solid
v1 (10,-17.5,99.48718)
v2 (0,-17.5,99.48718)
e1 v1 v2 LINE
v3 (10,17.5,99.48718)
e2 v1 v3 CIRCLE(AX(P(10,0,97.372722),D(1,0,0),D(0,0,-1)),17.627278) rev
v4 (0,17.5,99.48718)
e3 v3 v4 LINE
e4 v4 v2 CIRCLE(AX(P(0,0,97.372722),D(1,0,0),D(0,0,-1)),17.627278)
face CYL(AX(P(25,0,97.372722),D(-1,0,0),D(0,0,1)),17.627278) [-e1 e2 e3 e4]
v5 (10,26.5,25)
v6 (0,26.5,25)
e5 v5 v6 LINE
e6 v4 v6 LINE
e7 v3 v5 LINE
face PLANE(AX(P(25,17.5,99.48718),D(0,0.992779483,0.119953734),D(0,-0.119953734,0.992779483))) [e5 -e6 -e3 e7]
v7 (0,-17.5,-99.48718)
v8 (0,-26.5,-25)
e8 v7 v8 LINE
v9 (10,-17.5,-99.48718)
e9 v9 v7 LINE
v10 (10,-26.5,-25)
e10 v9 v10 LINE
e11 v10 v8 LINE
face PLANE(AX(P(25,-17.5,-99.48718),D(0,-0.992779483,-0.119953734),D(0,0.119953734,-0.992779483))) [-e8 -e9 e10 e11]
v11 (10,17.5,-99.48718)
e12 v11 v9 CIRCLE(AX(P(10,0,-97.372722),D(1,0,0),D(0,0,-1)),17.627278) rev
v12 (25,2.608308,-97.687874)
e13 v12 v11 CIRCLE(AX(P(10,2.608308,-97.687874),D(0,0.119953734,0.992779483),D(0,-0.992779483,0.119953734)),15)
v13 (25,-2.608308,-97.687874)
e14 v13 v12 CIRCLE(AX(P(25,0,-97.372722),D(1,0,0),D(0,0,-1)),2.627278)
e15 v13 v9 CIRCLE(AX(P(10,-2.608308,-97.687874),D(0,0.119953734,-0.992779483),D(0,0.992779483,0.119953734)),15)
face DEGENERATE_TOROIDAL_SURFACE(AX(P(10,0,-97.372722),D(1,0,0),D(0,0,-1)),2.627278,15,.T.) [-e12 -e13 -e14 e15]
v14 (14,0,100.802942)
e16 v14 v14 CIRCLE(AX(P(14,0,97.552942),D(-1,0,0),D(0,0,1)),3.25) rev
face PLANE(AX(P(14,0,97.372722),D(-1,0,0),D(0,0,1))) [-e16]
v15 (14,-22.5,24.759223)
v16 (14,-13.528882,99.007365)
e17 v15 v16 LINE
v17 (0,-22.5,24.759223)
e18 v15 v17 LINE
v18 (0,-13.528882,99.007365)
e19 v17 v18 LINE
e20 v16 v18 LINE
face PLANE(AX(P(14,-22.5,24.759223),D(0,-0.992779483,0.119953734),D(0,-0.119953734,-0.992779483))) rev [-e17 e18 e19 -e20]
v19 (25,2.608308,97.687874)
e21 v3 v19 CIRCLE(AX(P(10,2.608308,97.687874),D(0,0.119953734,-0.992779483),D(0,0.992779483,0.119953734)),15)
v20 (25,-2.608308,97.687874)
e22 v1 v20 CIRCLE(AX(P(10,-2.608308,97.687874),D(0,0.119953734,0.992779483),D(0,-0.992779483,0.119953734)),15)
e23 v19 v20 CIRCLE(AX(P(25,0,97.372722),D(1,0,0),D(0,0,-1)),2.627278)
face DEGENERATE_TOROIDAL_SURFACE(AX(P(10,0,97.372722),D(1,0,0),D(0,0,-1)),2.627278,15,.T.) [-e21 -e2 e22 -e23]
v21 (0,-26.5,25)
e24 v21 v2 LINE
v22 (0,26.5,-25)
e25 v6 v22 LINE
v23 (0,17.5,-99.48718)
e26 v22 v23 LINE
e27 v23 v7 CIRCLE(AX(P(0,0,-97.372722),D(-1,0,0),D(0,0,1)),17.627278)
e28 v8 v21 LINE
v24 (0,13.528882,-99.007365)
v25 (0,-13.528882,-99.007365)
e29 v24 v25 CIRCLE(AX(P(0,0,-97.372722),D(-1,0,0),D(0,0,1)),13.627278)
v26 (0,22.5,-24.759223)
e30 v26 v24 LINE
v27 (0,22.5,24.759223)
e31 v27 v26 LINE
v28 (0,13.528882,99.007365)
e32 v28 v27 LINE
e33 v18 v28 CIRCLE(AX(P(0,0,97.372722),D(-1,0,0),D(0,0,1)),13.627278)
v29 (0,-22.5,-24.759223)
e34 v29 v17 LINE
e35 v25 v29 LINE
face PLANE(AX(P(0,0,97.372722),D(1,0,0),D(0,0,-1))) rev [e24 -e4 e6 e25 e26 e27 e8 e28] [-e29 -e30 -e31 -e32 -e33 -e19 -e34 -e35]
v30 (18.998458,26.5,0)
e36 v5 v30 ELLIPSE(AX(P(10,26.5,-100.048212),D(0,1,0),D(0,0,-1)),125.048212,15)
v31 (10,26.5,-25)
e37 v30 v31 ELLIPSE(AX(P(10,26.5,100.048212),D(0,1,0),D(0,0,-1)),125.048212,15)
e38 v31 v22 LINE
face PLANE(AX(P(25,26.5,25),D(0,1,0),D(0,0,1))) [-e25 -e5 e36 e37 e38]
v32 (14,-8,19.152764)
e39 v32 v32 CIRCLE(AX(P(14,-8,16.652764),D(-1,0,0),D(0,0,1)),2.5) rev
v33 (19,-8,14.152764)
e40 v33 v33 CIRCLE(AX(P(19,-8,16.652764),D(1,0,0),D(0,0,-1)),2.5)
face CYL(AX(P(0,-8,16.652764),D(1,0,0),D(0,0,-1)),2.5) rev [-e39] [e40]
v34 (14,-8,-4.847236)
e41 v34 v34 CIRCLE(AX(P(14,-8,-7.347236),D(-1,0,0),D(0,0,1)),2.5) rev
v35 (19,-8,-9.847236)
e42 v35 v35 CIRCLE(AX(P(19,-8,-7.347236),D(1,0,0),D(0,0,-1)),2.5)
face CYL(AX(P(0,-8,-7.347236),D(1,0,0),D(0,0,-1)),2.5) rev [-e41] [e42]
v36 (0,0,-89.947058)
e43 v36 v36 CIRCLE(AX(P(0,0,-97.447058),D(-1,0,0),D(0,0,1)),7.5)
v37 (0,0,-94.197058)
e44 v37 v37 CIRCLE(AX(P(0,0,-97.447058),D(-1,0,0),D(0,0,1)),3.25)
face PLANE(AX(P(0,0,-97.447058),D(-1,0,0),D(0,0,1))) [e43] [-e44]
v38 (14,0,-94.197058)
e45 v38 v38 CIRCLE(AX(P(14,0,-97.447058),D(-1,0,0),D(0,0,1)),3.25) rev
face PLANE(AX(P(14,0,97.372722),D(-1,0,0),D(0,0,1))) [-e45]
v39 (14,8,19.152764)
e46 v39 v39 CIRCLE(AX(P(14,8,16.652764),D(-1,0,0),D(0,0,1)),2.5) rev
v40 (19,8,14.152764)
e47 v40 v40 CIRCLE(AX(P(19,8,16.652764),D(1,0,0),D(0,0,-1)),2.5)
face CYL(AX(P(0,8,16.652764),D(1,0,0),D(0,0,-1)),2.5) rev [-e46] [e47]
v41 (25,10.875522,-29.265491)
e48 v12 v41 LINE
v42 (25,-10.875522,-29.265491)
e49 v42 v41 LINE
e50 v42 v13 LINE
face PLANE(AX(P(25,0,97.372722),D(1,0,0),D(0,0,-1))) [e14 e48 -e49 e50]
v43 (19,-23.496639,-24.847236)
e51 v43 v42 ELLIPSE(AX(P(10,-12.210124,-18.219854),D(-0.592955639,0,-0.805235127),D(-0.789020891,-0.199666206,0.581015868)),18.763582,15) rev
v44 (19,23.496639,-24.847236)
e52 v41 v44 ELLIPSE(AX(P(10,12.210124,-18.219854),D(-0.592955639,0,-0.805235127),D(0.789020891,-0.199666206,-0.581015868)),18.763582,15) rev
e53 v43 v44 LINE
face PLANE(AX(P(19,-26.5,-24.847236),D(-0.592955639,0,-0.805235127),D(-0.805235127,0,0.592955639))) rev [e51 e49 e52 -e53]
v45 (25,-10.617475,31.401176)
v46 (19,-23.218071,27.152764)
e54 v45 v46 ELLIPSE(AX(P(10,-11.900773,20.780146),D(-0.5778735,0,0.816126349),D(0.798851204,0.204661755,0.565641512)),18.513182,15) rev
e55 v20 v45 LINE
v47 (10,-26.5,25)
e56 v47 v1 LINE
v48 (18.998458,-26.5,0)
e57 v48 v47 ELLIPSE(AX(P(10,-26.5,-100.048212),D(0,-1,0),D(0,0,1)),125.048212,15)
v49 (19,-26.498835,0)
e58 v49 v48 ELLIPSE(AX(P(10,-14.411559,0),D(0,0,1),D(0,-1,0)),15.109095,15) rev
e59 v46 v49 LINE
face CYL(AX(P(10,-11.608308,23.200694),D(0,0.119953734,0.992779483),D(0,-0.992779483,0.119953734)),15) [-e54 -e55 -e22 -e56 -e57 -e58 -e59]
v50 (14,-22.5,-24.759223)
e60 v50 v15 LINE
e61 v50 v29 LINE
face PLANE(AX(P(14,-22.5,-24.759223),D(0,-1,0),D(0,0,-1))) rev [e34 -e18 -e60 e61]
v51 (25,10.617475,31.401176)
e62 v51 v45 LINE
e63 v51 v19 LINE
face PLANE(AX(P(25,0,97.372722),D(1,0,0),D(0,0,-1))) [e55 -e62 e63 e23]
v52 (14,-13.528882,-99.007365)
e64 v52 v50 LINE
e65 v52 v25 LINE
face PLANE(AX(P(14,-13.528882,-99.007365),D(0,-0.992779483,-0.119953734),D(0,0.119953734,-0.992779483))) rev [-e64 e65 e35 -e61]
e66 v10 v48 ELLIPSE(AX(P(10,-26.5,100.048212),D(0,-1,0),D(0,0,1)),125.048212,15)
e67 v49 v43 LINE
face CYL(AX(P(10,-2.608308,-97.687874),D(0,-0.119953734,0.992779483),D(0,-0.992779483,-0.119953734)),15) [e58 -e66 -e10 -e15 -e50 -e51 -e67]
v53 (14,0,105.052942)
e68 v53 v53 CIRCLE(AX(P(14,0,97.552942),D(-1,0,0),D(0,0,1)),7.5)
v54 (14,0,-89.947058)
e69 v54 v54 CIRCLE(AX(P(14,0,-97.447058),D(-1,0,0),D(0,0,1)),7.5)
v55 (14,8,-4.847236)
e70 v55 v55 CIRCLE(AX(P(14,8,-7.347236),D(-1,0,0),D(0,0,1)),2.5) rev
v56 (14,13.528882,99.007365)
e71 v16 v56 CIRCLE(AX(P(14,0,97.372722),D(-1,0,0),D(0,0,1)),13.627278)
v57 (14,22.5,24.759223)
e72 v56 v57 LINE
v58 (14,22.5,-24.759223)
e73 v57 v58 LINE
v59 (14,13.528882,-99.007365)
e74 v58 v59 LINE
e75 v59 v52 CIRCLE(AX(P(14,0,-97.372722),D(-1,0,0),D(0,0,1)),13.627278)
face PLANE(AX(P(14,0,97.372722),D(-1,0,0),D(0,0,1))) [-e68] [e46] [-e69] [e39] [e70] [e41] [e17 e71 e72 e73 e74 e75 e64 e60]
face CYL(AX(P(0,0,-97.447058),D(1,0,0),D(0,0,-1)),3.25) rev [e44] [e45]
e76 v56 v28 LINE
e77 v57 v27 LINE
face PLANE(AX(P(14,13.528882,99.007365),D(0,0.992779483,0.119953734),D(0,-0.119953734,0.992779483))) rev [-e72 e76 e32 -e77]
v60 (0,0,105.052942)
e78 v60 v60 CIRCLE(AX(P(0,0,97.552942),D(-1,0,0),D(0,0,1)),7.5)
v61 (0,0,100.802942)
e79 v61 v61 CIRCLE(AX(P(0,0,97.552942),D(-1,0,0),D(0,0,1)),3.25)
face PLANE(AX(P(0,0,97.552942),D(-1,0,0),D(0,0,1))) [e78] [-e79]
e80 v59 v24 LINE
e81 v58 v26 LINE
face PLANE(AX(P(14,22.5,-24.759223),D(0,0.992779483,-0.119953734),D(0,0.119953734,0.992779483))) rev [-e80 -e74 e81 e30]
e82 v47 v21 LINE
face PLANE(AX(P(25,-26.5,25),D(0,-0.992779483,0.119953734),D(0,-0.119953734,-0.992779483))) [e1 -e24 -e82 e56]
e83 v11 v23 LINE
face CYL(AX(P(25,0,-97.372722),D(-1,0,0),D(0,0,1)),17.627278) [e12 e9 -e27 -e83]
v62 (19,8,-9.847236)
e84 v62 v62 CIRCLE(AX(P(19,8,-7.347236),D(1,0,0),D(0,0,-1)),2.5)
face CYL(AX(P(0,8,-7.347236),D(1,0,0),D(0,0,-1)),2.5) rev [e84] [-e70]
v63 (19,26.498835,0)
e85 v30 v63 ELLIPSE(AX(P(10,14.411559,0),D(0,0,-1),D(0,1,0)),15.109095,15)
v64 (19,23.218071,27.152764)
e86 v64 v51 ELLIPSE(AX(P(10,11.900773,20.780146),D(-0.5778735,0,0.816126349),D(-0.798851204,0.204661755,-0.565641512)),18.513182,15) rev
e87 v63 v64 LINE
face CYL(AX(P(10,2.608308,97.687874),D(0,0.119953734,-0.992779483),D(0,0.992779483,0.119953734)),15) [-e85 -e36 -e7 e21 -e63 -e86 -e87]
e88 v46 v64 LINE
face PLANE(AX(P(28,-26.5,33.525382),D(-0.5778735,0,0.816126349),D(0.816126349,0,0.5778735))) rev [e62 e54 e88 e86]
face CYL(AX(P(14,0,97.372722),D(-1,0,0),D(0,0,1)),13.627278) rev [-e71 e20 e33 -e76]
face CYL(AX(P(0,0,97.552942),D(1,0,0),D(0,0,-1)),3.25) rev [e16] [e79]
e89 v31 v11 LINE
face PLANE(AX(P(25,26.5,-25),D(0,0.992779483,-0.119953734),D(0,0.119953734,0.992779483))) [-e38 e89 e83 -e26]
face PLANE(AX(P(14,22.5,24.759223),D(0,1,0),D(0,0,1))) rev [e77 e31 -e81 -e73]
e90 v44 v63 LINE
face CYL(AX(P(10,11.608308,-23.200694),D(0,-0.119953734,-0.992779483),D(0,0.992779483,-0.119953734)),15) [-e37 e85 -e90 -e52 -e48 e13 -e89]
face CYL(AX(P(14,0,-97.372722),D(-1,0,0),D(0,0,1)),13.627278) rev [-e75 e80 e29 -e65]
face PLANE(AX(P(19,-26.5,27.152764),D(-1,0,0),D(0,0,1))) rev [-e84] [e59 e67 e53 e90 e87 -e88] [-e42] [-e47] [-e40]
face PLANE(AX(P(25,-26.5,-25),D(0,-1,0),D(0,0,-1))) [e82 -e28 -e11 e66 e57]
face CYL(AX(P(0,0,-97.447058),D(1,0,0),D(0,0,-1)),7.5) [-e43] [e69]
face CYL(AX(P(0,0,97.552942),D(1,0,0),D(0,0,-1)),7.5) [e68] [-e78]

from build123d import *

# Parameters (mm, degrees)
EXTRUDE_1_DEPTH          = 25
FILLET_2_R               = 15
CUT_EXTRUDE_2_DEPTH      = 121.632707028
CUT_EXTRUDE_2_DEPTH_BACK = 121.632707028
SKETCH_9_R               = 2.5
CUT_EXTRUDE_3_DEPTH      = 120.533468117
PATTERN_LINEAR_1_COUNT   = 2
PATTERN_LINEAR_1_PITCH   = 24
CUT_EXTRUDE_4_DEPTH      = 14
SKETCH_11_R              = 7.5
SKETCH_11_R_2            = 3.25
EXTRUDE_3_DEPTH          = 14
PATTERN_LINEAR_2_COUNT   = 2
PATTERN_LINEAR_2_PITCH   = 195


with BuildPart() as part:
    # Эскиз4 → Бобышка-Вытянуть1 (new body)
    with BuildSketch(Plane(origin=(0, 0, 0), x_dir=(0, 0, -1), z_dir=(1, 0, 0))):
        with BuildLine():
            Line((-25, 26.5), (25, 26.5))
            Line((25, 26.5), (99.487179761, 17.5))
            ThreePointArc((99.487179761, 17.5), (115, 0), (99.487179761, -17.5))
            Line((99.487179761, -17.5), (25, -26.5))
            Line((25, -26.5), (-25, -26.5))
            Line((-25, -26.5), (-99.487179761, -17.5))
            ThreePointArc((-99.487179761, -17.5), (-115, 0), (-99.487179761, 17.5))
            Line((-99.487179761, 17.5), (-25, 26.5))
        make_face()
    extrude(amount=EXTRUDE_1_DEPTH)

    # Скругление2
    # the kernel refuses this fillet: 15 mm, written as the material it takes off along each edge
    with BuildSketch(Plane(origin=(25, 30.998265024, 12.229230609), x_dir=(-1, 0, 0), z_dir=(0, -0.11995373398361225, -0.9927794829182304)), Plane(origin=(25, 17.5, 99.487179761), x_dir=(-1, 0, 0), z_dir=(0, 0.11995373398361225, -0.9927794829182304)), Plane(origin=(25, -30.998265024, -12.229230609), x_dir=(-1, 0, 0), z_dir=(0, 0.11995373398361238, 0.9927794829182304)), Plane(origin=(25, -17.5, -99.487179761), x_dir=(-1, 0, 0), z_dir=(0, -0.1199537339836124, 0.9927794829182304))) as fillet_2_piece_1:
        with BuildLine():
            CenterArc((FILLET_2_R, -FILLET_2_R), FILLET_2_R, 90, 90)
            Line((0, -FILLET_2_R), (0, 0))
            Line((0, 0), (FILLET_2_R, 0))
        make_face()
    extrude(amount=112.528927413, mode=Mode.SUBTRACT)
    with BuildSketch(Plane(origin=(25, 0, -97.372721938), x_dir=(0, 0.9927794829182303, -0.11995373398361334), z_dir=(0, 0.11995373398361334, 0.9927794829182303))) as fillet_2_piece_2:
        with BuildLine():
            CenterArc((17.627278062 - FILLET_2_R, FILLET_2_R), FILLET_2_R, 270, 90)
            Line((17.627278062 - FILLET_2_R, 0), (17.627278062, 0))
            Line((17.627278062, 0), (17.627278062, FILLET_2_R))
        make_face()
    revolve(axis=Axis((25, 0, -97.372721938), (-1, 0, 0)), revolution_arc=166.221135111, mode=Mode.SUBTRACT)
    with BuildSketch(Plane(origin=(25, 0, 97.372721938), x_dir=(0, -0.9927794829182303, 0.11995373398361334), z_dir=(0, -0.11995373398361334, -0.9927794829182303))) as fillet_2_piece_3:
        with BuildLine():
            CenterArc((17.627278062 - FILLET_2_R, FILLET_2_R), FILLET_2_R, 270, 90)
            Line((17.627278062 - FILLET_2_R, 0), (17.627278062, 0))
            Line((17.627278062, 0), (17.627278062, FILLET_2_R))
        make_face()
    revolve(axis=Axis((25, 0, 97.372721938), (-1, 0, 0)), revolution_arc=166.221135111, mode=Mode.SUBTRACT)

    # Эскиз8 → Вырез-Вытянуть2 (cut, two sides: drawn at the far end of the back side and taken through both)
    with BuildSketch(Plane(origin=(0, 0, 0), x_dir=(1, 0, 0), z_dir=(0, 1, 0)).offset(-CUT_EXTRUDE_2_DEPTH_BACK)):
        Polygon((19, -27.152763866), (19, 24.847236134), (28, 31.474618083), (28, -33.525381917), align=None)
    extrude(amount=CUT_EXTRUDE_2_DEPTH + CUT_EXTRUDE_2_DEPTH_BACK, mode=Mode.SUBTRACT)

    # Эскиз9 → Вырез-Вытянуть3 (cut, through all)
    with BuildSketch(Plane(origin=(19, 0, 0), x_dir=(0, 0, -1), z_dir=(1, 0, 0))):
        with Locations((-16.652763866, 8)):
            Circle(SKETCH_9_R)
        with Locations((-16.652763866, -8)):
            Circle(SKETCH_9_R)
    cut_extrude_3 = extrude(amount=-CUT_EXTRUDE_3_DEPTH, mode=Mode.SUBTRACT)

    # Линейный массив1: Вырез-Вытянуть3 ×2
    with Locations(*[(0, 0, -i * PATTERN_LINEAR_1_PITCH) for i in range(1, PATTERN_LINEAR_1_COUNT)]):
        add(cut_extrude_3, mode=Mode.SUBTRACT)

    # Эскиз10 → Вырез-Вытянуть4 (cut)
    with BuildSketch(Plane.ZY):
        with BuildLine():
            Line((99.007364825, 13.528882068), (24.759223266, 22.5))
            Line((24.759223266, 22.5), (-24.759223266, 22.5))
            Line((-24.759223266, 22.5), (-99.007364825, 13.528882068))
            ThreePointArc((-99.007364825, 13.528882068), (-111, 0), (-99.007364825, -13.528882068))
            Line((-99.007364825, -13.528882068), (-24.759223266, -22.5))
            Line((-24.759223266, -22.5), (24.759223266, -22.5))
            Line((24.759223266, -22.5), (99.007364825, -13.528882068))
            ThreePointArc((99.007364825, -13.528882068), (111, 0), (99.007364825, 13.528882068))
        make_face()
    extrude(amount=-CUT_EXTRUDE_4_DEPTH, mode=Mode.SUBTRACT)

    # Эскиз11 → Бобышка-Вытянуть3 (add)
    with BuildSketch(Plane.ZY.offset(-14)):
        with Locations((97.552941864, 0)):
            Circle(SKETCH_11_R)
        with Locations((97.552941864, 0)):
            Circle(SKETCH_11_R_2, mode=Mode.SUBTRACT)
    extrude_3 = extrude(amount=EXTRUDE_3_DEPTH)

    # Линейный массив2: Бобышка-Вытянуть3 ×2
    with Locations(*[(0, 0, -i * PATTERN_LINEAR_2_PITCH) for i in range(1, PATTERN_LINEAR_2_COUNT)]):
        add(extrude_3)


solid = part.part
